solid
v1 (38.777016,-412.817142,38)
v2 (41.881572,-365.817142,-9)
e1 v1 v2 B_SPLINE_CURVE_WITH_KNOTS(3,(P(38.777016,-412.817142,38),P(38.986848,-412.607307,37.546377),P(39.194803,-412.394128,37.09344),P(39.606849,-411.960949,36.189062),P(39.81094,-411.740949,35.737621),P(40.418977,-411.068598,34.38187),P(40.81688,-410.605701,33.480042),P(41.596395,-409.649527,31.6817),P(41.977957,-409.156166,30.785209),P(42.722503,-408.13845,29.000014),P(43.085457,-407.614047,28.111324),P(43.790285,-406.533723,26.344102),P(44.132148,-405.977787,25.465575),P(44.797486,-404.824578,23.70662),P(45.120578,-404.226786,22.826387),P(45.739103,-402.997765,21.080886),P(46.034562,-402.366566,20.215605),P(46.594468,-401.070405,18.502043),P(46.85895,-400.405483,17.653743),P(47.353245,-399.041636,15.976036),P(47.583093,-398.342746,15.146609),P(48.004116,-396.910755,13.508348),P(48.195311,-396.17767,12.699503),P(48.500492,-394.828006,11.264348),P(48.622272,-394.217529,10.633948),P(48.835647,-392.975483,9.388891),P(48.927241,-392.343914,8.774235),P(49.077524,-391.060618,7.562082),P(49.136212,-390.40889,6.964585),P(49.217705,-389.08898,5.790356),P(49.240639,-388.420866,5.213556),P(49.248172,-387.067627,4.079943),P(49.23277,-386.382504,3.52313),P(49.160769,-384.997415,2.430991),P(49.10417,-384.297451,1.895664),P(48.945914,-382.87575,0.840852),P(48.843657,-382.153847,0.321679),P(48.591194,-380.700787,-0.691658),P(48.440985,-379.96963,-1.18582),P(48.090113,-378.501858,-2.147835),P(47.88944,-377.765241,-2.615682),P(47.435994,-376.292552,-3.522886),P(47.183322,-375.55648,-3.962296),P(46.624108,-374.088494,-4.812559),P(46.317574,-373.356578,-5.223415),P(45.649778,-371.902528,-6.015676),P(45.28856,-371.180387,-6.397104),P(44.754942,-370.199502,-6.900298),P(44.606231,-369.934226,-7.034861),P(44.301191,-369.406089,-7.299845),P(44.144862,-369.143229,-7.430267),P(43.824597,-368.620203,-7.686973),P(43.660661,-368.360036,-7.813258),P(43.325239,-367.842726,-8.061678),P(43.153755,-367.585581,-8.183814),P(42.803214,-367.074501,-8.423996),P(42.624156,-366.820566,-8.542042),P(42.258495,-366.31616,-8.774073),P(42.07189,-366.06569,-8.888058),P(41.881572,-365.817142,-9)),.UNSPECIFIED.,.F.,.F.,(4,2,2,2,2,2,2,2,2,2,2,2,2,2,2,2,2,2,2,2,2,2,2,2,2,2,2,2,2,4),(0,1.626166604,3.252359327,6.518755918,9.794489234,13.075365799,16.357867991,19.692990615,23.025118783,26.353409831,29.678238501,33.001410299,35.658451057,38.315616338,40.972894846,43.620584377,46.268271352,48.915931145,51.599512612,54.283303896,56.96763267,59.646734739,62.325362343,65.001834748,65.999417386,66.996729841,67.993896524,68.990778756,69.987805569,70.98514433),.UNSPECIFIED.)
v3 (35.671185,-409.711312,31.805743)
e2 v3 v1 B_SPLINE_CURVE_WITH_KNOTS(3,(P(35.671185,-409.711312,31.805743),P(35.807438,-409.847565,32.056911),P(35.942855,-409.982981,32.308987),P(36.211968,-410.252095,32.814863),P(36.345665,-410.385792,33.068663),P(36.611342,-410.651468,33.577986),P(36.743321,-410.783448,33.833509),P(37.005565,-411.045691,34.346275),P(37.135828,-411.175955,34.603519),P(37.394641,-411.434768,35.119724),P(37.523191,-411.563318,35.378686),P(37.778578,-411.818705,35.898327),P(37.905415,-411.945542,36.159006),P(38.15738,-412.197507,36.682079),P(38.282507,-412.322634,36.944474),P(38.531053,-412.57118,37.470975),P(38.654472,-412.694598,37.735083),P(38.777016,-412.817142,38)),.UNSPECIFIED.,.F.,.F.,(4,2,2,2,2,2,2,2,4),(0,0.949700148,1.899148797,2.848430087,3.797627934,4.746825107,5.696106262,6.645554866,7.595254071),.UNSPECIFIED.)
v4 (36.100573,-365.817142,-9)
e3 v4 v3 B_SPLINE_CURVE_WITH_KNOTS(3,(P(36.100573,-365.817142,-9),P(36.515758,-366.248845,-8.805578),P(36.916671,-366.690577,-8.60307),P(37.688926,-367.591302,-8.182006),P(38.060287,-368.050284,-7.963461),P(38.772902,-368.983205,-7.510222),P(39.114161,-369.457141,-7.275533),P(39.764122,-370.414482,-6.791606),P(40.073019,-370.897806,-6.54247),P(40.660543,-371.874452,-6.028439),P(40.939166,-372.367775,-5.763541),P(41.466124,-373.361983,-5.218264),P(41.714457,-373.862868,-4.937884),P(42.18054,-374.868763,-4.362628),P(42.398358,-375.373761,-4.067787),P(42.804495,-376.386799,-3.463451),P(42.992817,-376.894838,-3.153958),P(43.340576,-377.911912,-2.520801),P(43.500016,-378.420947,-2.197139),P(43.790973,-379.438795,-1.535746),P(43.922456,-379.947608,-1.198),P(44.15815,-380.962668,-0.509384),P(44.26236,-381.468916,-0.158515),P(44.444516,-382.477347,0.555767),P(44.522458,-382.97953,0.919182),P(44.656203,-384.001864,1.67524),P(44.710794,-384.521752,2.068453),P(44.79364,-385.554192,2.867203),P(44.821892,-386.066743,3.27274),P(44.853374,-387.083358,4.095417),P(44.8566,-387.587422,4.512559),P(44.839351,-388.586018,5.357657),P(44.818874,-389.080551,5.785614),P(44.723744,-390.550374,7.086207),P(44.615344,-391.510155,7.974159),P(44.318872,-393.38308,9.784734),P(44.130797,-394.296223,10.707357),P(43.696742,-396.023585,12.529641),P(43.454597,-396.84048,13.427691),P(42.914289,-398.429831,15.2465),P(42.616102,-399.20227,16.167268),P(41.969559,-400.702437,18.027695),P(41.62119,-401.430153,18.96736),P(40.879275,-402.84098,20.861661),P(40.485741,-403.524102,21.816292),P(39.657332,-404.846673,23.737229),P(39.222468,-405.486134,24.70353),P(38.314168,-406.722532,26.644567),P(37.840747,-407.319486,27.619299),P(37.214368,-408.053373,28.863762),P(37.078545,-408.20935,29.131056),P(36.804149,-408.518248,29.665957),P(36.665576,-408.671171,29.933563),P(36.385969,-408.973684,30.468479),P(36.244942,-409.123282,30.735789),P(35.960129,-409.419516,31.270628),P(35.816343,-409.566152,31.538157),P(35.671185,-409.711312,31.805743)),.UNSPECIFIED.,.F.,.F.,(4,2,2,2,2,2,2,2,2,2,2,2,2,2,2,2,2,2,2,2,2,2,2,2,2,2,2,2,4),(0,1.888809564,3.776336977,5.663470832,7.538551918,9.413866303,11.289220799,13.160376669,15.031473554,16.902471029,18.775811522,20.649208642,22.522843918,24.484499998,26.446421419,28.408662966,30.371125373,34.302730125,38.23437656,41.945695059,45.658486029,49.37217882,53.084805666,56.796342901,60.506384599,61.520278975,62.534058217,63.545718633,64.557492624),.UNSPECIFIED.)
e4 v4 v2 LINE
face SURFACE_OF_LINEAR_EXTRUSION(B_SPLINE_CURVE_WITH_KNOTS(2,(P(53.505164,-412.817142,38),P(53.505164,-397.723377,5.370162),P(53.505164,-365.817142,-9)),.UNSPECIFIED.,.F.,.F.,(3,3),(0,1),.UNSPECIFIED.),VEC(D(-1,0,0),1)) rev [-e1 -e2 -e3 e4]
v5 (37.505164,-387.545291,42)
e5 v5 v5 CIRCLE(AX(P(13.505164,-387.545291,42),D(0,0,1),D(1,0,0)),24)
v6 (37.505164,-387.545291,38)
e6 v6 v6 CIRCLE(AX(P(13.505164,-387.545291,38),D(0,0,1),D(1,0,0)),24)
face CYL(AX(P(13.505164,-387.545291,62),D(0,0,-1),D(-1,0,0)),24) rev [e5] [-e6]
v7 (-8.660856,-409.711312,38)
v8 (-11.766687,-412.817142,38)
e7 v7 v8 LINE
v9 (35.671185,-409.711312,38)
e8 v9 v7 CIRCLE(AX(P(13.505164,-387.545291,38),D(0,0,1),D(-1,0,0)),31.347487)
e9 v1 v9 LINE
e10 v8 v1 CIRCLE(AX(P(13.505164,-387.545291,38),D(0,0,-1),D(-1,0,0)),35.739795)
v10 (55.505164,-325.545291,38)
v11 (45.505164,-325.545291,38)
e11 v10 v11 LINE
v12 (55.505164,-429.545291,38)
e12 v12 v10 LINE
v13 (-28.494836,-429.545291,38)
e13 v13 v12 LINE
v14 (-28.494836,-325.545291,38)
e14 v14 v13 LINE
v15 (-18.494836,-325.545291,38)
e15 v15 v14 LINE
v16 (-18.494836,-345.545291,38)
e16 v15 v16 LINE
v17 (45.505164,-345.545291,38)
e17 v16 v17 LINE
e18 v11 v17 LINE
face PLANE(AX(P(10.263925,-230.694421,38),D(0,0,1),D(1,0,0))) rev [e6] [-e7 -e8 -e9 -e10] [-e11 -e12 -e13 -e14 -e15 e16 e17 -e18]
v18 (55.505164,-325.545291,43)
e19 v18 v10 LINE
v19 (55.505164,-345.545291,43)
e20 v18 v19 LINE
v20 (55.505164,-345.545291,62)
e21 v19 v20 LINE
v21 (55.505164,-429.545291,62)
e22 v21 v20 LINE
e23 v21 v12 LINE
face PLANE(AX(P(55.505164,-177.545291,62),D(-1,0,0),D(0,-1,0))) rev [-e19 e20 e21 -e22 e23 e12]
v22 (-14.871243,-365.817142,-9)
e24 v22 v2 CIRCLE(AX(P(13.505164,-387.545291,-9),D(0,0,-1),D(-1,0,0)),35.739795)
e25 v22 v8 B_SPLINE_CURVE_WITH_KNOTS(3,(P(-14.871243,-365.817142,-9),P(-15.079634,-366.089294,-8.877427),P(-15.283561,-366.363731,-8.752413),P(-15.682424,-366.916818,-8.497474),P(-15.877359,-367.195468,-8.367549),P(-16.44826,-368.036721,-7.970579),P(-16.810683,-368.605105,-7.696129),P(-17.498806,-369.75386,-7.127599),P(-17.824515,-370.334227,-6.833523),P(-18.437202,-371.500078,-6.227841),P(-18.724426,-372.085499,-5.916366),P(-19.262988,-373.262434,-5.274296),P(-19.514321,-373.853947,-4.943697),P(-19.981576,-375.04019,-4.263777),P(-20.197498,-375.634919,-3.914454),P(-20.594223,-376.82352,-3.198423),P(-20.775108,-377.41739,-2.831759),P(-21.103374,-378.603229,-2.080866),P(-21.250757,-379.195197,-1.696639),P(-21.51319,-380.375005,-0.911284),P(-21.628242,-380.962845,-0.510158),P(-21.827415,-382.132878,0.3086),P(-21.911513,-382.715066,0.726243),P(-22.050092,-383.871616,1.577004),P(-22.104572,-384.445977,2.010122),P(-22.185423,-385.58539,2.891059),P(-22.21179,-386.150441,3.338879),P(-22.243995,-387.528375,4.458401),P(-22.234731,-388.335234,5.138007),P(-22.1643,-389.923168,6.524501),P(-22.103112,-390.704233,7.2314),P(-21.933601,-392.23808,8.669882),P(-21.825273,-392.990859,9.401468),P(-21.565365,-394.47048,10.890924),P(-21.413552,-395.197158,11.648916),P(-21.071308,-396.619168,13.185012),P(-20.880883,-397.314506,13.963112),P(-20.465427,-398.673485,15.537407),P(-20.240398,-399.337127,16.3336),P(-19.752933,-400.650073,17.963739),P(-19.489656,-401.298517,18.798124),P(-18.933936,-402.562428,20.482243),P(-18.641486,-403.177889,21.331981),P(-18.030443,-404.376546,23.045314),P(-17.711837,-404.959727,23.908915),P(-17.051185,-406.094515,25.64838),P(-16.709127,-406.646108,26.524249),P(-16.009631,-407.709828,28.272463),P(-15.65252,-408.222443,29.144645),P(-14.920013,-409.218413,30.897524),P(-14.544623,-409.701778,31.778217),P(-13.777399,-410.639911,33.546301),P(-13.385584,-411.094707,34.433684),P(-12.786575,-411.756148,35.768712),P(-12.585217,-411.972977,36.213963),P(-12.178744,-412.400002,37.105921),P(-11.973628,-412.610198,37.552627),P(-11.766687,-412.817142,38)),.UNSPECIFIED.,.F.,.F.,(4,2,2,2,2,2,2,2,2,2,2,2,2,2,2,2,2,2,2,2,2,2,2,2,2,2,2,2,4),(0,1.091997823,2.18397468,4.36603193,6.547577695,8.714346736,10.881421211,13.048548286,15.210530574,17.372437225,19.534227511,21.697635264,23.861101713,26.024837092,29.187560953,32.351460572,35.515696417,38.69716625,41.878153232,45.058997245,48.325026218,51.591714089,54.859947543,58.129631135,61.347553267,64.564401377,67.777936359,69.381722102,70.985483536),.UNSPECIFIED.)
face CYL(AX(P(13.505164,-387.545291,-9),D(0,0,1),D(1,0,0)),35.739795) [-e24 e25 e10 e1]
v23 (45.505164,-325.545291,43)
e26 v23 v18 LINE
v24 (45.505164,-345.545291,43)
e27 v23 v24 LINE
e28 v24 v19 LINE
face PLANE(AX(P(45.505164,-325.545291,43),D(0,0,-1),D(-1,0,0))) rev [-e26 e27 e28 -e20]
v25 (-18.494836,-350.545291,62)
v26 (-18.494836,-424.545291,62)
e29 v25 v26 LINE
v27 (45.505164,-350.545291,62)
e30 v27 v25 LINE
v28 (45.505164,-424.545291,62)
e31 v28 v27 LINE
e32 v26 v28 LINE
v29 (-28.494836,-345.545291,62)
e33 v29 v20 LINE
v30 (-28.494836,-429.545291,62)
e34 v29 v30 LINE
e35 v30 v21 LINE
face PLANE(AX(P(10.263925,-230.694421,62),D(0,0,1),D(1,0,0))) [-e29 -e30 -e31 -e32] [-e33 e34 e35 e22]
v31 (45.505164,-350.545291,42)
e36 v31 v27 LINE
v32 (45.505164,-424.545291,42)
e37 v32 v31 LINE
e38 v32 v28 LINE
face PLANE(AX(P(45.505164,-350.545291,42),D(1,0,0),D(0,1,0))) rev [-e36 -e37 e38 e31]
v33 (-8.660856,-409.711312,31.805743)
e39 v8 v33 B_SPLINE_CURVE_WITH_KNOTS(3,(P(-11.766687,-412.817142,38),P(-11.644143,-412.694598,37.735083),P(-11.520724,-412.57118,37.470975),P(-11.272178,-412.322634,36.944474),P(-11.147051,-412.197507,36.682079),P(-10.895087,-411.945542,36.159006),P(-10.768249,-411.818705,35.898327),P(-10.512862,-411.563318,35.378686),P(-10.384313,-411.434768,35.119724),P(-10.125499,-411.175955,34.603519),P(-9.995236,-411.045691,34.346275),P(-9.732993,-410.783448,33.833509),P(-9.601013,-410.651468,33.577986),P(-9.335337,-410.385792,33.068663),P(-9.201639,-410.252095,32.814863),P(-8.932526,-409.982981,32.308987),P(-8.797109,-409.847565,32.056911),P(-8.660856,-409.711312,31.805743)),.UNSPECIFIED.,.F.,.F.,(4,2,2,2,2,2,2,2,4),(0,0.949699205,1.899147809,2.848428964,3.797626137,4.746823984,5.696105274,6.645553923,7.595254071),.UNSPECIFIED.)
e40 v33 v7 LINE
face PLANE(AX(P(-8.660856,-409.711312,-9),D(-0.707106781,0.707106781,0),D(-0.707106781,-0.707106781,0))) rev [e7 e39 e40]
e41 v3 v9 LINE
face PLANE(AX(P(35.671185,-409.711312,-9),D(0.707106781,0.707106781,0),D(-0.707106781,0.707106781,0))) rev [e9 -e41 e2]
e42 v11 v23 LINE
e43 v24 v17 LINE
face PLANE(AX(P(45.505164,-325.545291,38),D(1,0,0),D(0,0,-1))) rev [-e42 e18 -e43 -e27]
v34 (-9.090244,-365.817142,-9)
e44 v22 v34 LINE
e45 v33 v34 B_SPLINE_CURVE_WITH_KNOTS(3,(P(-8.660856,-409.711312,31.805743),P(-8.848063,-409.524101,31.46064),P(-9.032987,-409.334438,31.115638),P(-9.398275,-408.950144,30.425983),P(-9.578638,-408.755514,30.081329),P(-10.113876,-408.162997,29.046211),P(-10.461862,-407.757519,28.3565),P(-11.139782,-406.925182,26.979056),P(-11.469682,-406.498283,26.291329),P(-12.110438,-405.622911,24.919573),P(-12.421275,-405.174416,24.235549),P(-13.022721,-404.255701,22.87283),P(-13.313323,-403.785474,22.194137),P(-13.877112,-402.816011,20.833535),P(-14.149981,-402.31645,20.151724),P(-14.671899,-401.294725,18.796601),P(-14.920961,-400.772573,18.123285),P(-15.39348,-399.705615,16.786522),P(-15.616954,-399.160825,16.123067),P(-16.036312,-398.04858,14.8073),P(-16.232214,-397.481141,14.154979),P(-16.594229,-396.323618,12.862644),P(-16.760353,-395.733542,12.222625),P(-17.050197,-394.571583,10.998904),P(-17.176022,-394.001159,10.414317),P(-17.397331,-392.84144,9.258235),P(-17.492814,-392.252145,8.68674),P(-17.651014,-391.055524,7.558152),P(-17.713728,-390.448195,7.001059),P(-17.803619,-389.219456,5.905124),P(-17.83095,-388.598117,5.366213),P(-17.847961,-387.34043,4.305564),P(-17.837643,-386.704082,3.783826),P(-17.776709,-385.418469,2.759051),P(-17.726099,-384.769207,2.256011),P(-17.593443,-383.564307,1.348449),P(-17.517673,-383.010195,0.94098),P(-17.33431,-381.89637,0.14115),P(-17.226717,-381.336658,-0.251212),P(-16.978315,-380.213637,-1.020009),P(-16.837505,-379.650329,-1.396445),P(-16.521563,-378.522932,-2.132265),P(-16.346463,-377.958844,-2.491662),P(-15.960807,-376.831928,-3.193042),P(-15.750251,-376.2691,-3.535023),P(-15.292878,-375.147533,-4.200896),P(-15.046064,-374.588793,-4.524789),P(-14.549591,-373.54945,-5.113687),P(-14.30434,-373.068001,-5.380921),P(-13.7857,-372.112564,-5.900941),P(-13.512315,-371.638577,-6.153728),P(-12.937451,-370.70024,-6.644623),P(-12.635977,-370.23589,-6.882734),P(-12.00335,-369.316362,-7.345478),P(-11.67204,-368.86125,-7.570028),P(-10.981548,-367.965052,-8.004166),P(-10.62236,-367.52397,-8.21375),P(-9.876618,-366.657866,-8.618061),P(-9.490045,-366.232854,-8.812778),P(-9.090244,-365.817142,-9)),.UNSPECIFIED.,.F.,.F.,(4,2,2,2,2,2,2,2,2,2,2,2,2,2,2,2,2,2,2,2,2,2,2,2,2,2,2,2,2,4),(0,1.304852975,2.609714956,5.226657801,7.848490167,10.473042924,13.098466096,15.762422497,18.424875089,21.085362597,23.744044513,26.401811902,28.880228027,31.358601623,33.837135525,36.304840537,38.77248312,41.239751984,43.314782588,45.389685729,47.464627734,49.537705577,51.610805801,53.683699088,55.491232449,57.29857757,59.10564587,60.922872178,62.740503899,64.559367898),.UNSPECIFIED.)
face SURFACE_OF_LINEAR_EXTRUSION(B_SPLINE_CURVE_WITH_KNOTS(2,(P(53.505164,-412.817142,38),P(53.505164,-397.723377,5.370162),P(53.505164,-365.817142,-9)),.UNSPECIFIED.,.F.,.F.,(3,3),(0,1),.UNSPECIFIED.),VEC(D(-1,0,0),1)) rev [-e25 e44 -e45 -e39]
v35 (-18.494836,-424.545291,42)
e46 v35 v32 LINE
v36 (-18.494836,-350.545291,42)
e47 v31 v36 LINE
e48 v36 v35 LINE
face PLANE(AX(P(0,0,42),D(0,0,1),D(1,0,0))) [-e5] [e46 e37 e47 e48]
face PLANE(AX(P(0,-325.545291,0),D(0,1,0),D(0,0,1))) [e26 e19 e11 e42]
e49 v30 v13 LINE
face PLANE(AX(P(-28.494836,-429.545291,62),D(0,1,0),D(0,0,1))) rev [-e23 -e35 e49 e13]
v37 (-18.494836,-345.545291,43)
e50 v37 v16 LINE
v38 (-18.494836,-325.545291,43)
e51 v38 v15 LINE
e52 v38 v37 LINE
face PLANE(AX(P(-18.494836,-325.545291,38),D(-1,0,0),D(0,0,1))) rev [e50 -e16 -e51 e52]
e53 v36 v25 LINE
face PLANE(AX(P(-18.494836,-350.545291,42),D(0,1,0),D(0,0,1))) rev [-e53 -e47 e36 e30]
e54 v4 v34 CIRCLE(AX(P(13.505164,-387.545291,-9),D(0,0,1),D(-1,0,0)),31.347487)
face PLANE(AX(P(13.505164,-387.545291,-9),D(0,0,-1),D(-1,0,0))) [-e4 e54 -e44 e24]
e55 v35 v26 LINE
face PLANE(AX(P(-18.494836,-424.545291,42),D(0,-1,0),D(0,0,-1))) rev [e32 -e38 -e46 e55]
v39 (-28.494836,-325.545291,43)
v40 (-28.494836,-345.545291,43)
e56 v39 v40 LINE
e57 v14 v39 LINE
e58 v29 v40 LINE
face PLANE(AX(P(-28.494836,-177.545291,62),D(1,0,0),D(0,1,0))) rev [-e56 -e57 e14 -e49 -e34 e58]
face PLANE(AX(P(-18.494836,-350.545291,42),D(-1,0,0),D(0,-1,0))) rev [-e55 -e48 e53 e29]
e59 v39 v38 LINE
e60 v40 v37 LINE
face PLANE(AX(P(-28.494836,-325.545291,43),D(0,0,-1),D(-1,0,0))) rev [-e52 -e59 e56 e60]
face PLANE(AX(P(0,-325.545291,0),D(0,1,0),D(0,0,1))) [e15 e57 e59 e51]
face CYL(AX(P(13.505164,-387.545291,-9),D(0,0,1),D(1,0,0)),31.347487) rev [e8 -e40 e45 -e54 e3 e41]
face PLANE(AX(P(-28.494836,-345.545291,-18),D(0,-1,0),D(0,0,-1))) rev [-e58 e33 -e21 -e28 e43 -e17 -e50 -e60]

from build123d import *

# Parameters (mm, degrees)
SKETCH2_W            = 350
SKETCH2_H            = 1050
SKETCH2_R            = 100
BOSS_EXTRUDE2_DEPTH  = 100
SCALE1_SCALE         = 0.24
SKETCH6_W            = 84
SKETCH6_H            = 168
CUT_EXTRUDE3_DEPTH   = 80
SKETCH11_W           = 64
SKETCH11_H           = 74
CUT_EXTRUDE8_DEPTH   = 20
SKETCH12_W           = 10
SKETCH12_H           = 5
BOSS_EXTRUDE6_DEPTH  = 20
SKETCH13_W           = 10
SKETCH13_H           = 5
BOSS_EXTRUDE7_DEPTH  = 20
SKETCH14_W           = 10
SKETCH14_H           = 5
CUT_EXTRUDE9_DEPTH   = 40
SKETCH15_W           = 10
SKETCH15_H           = 5
CUT_EXTRUDE10_DEPTH  = 40
SKETCH16_W           = 10
SKETCH16_H           = 20
CUT_EXTRUDE11_DEPTH  = 5
SKETCH17_W           = 10
SKETCH17_H           = 20
CUT_EXTRUDE12_DEPTH  = 5
BOSS_EXTRUDE9_DEPTH  = 47
SWEEP3_START         = -9
SWEEP3_DEPTH         = 47
CUT_EXTRUDE13_DEPTH  = 82
SKETCH28_W           = 10
SKETCH28_H           = 20
BOSS_EXTRUDE10_DEPTH = 5
SKETCH29_W           = 10
SKETCH29_H           = 20
BOSS_EXTRUDE11_DEPTH = 5
SKETCH30_W           = 10
SKETCH30_H           = 5
BOSS_EXTRUDE12_DEPTH = 40
SKETCH31_W           = 10
SKETCH31_H           = 5
BOSS_EXTRUDE13_DEPTH = 40


# Read off the part's stored shape, not the designer's step: Sweep3
with BuildPart() as part:
    # Sketch2 → Boss-Extrude2 (new body)
    with BuildSketch(Plane.XY):
        with Locations((13.505164405, -303.545290931)):
            Rectangle(SKETCH2_W, SKETCH2_H)
        with Locations((13.505164405, 46.454709069)):
            Circle(SKETCH2_R, mode=Mode.SUBTRACT)
        with Locations((13.505164405, -303.545290931)):
            Circle(SKETCH2_R, mode=Mode.SUBTRACT)
        with Locations((13.505164405, -653.545290931)):
            Circle(SKETCH2_R, mode=Mode.SUBTRACT)
    extrude(amount=BOSS_EXTRUDE2_DEPTH)


with BuildPart() as part_1:
    # Scale1: scaled about (13.505164405, -303.545290931, 50)
    add(part.part.scale(SCALE1_SCALE).moved(Location((10.263924948, -230.694421108, 38))))

    # Sketch6 → Cut-Extrude3 (cut)
    with BuildSketch(Plane.XY.offset(62)):
        with Locations((13.505164405, -261.545290931)):
            Rectangle(SKETCH6_W, SKETCH6_H)
    extrude(amount=-CUT_EXTRUDE3_DEPTH, mode=Mode.SUBTRACT)

    # Sketch11 → Cut-Extrude8 (cut)
    with BuildSketch(Plane.XY.offset(62)):
        with Locations((13.505164405, -387.545290931)):
            Rectangle(SKETCH11_W, SKETCH11_H)
    extrude(amount=-CUT_EXTRUDE8_DEPTH, mode=Mode.SUBTRACT)

    # Sketch12 → Boss-Extrude6 (add)
    with BuildSketch(Plane(origin=(0, -429.545290931, 0), x_dir=(-1, 0, 0), z_dir=(0, -1, 0))):
        with Locations((23.494835595, -40.5)):
            Rectangle(SKETCH12_W, SKETCH12_H)
    extrude(amount=BOSS_EXTRUDE6_DEPTH)

    # Sketch13 → Boss-Extrude7 (add)
    with BuildSketch(Plane(origin=(0, -429.545290931, 0), x_dir=(-1, 0, 0), z_dir=(0, -1, 0))):
        with Locations((-50.505164405, -40.5)):
            Rectangle(SKETCH13_W, SKETCH13_H)
    extrude(amount=BOSS_EXTRUDE7_DEPTH)

    # Sketch14 → Cut-Extrude9 (cut)
    with BuildSketch(Plane.XZ.offset(449.545290931)):
        with Locations((-23.494835595, 40.5)):
            Rectangle(SKETCH14_W, SKETCH14_H)
    extrude(amount=-CUT_EXTRUDE9_DEPTH, mode=Mode.SUBTRACT)

    # Sketch15 → Cut-Extrude10 (cut)
    with BuildSketch(Plane(origin=(0, -449.545290931, 0), x_dir=(-1, 0, 0), z_dir=(0, -1, 0))):
        with Locations((-50.505164405, -40.5)):
            Rectangle(SKETCH15_W, SKETCH15_H)
    extrude(amount=-CUT_EXTRUDE10_DEPTH, mode=Mode.SUBTRACT)

    # Sketch16 → Cut-Extrude11 (cut)
    with BuildSketch(Plane(origin=(0, 0, 38), x_dir=(-1, 0, 0), z_dir=(0, 0, -1))):
        with Locations((23.494835595, -355.545290931)):
            Rectangle(SKETCH16_W, SKETCH16_H)
    extrude(amount=-CUT_EXTRUDE11_DEPTH, mode=Mode.SUBTRACT)

    # Sketch17 → Cut-Extrude12 (cut)
    with BuildSketch(Plane(origin=(0, 0, 38), x_dir=(-1, 0, 0), z_dir=(0, 0, -1))):
        with Locations((-50.505164405, -355.545290931)):
            Rectangle(SKETCH17_W, SKETCH17_H)
    extrude(amount=-CUT_EXTRUDE12_DEPTH, mode=Mode.SUBTRACT)

    # Sketch18 → Boss-Extrude9 (add)
    with BuildSketch(Plane(origin=(0, 0, 38), x_dir=(-1, 0, 0), z_dir=(0, 0, -1))):
        with BuildLine():
            Line((-35.671185106, -409.711311632), (-38.7770157, -412.817142227))
            ThreePointArc((-38.7770157, -412.817142227), (-13.505164405, -351.805496082), (11.766686891, -412.817142227))
            Line((11.766686891, -412.817142227), (8.660856297, -409.711311632))
            ThreePointArc((8.660856297, -409.711311632), (-13.505164405, -356.197803831), (-35.671185106, -409.711311632))
        make_face()
    extrude(amount=BOSS_EXTRUDE9_DEPTH)


with BuildPart() as body_2:
    # Sweep3 outline → Sweep3 (new body)
    with BuildSketch(Plane.XY.offset(SWEEP3_START)):
        with BuildLine():
            Line((35.671185106, -409.711311632), (38.7770157, -412.817142227))
            ThreePointArc((38.7770157, -412.817142227), (13.505164405, -351.805496082), (-11.766686891, -412.817142227))
            Line((-11.766686891, -412.817142227), (-8.660856297, -409.711311632))
            ThreePointArc((-8.660856297, -409.711311632), (13.505164404, -356.197803831), (35.671185106, -409.711311632))
        make_face()
    extrude(amount=SWEEP3_DEPTH)


with BuildPart() as cut_extrude13_tool:
    # Sketch27 → Cut-Extrude13 (new body)
    with BuildSketch(Plane.ZY.offset(28.494835595)):
        with BuildLine():
            Line((38, -412.817142227), (-9, -412.817142227))
            Line((-9, -412.817142227), (-9, -365.817142227))
            add(Edge.make_bspline(
                [(-9, -365.817142227), (5.370162337, -397.723377267), (38, -412.817142227)],
                knots=[0, 0, 0, 1, 1, 1], degree=2))
        make_face()
    extrude(amount=-CUT_EXTRUDE13_DEPTH)


with BuildPart() as part_2:
    add(part_1.part)

    # Cut-Extrude13: cut by cut_extrude13_tool
    add(cut_extrude13_tool.part, mode=Mode.SUBTRACT)



with BuildPart() as body_2_1:
    add(body_2.part)

    # Cut-Extrude13: cut by cut_extrude13_tool
    add(cut_extrude13_tool.part, mode=Mode.SUBTRACT)


with BuildPart() as part_3:
    add(part_2.part)

    add(body_2_1.part)  # Boss-Extrude10 merges body 2
    # Sketch28 → Boss-Extrude10 (add)
    with BuildSketch(Plane(origin=(0, 0, 43), x_dir=(-1, 0, 0), z_dir=(0, 0, -1))):
        with Locations((-50.505164405, -419.545290931)):
            Rectangle(SKETCH28_W, SKETCH28_H)
    extrude(amount=BOSS_EXTRUDE10_DEPTH)

    # Sketch29 → Boss-Extrude11 (add)
    with BuildSketch(Plane(origin=(0, 0, 43), x_dir=(-1, 0, 0), z_dir=(0, 0, -1))):
        with Locations((23.494835595, -419.545290931)):
            Rectangle(SKETCH29_W, SKETCH29_H)
    extrude(amount=BOSS_EXTRUDE11_DEPTH)

    # Sketch30 → Boss-Extrude12 (add)
    with BuildSketch(Plane(origin=(0, -365.545290931, 0), x_dir=(1, 0, 0), z_dir=(0, 1, 0))):
        with Locations((50.505164405, -40.5)):
            Rectangle(SKETCH30_W, SKETCH30_H)
    extrude(amount=BOSS_EXTRUDE12_DEPTH)

    # Sketch31 → Boss-Extrude13 (add)
    with BuildSketch(Plane(origin=(0, -365.545290931, 0), x_dir=(1, 0, 0), z_dir=(0, 1, 0))):
        with Locations((-23.494835595, -40.5)):
            Rectangle(SKETCH31_W, SKETCH31_H)
    extrude(amount=BOSS_EXTRUDE13_DEPTH)


solid = part_3.part
